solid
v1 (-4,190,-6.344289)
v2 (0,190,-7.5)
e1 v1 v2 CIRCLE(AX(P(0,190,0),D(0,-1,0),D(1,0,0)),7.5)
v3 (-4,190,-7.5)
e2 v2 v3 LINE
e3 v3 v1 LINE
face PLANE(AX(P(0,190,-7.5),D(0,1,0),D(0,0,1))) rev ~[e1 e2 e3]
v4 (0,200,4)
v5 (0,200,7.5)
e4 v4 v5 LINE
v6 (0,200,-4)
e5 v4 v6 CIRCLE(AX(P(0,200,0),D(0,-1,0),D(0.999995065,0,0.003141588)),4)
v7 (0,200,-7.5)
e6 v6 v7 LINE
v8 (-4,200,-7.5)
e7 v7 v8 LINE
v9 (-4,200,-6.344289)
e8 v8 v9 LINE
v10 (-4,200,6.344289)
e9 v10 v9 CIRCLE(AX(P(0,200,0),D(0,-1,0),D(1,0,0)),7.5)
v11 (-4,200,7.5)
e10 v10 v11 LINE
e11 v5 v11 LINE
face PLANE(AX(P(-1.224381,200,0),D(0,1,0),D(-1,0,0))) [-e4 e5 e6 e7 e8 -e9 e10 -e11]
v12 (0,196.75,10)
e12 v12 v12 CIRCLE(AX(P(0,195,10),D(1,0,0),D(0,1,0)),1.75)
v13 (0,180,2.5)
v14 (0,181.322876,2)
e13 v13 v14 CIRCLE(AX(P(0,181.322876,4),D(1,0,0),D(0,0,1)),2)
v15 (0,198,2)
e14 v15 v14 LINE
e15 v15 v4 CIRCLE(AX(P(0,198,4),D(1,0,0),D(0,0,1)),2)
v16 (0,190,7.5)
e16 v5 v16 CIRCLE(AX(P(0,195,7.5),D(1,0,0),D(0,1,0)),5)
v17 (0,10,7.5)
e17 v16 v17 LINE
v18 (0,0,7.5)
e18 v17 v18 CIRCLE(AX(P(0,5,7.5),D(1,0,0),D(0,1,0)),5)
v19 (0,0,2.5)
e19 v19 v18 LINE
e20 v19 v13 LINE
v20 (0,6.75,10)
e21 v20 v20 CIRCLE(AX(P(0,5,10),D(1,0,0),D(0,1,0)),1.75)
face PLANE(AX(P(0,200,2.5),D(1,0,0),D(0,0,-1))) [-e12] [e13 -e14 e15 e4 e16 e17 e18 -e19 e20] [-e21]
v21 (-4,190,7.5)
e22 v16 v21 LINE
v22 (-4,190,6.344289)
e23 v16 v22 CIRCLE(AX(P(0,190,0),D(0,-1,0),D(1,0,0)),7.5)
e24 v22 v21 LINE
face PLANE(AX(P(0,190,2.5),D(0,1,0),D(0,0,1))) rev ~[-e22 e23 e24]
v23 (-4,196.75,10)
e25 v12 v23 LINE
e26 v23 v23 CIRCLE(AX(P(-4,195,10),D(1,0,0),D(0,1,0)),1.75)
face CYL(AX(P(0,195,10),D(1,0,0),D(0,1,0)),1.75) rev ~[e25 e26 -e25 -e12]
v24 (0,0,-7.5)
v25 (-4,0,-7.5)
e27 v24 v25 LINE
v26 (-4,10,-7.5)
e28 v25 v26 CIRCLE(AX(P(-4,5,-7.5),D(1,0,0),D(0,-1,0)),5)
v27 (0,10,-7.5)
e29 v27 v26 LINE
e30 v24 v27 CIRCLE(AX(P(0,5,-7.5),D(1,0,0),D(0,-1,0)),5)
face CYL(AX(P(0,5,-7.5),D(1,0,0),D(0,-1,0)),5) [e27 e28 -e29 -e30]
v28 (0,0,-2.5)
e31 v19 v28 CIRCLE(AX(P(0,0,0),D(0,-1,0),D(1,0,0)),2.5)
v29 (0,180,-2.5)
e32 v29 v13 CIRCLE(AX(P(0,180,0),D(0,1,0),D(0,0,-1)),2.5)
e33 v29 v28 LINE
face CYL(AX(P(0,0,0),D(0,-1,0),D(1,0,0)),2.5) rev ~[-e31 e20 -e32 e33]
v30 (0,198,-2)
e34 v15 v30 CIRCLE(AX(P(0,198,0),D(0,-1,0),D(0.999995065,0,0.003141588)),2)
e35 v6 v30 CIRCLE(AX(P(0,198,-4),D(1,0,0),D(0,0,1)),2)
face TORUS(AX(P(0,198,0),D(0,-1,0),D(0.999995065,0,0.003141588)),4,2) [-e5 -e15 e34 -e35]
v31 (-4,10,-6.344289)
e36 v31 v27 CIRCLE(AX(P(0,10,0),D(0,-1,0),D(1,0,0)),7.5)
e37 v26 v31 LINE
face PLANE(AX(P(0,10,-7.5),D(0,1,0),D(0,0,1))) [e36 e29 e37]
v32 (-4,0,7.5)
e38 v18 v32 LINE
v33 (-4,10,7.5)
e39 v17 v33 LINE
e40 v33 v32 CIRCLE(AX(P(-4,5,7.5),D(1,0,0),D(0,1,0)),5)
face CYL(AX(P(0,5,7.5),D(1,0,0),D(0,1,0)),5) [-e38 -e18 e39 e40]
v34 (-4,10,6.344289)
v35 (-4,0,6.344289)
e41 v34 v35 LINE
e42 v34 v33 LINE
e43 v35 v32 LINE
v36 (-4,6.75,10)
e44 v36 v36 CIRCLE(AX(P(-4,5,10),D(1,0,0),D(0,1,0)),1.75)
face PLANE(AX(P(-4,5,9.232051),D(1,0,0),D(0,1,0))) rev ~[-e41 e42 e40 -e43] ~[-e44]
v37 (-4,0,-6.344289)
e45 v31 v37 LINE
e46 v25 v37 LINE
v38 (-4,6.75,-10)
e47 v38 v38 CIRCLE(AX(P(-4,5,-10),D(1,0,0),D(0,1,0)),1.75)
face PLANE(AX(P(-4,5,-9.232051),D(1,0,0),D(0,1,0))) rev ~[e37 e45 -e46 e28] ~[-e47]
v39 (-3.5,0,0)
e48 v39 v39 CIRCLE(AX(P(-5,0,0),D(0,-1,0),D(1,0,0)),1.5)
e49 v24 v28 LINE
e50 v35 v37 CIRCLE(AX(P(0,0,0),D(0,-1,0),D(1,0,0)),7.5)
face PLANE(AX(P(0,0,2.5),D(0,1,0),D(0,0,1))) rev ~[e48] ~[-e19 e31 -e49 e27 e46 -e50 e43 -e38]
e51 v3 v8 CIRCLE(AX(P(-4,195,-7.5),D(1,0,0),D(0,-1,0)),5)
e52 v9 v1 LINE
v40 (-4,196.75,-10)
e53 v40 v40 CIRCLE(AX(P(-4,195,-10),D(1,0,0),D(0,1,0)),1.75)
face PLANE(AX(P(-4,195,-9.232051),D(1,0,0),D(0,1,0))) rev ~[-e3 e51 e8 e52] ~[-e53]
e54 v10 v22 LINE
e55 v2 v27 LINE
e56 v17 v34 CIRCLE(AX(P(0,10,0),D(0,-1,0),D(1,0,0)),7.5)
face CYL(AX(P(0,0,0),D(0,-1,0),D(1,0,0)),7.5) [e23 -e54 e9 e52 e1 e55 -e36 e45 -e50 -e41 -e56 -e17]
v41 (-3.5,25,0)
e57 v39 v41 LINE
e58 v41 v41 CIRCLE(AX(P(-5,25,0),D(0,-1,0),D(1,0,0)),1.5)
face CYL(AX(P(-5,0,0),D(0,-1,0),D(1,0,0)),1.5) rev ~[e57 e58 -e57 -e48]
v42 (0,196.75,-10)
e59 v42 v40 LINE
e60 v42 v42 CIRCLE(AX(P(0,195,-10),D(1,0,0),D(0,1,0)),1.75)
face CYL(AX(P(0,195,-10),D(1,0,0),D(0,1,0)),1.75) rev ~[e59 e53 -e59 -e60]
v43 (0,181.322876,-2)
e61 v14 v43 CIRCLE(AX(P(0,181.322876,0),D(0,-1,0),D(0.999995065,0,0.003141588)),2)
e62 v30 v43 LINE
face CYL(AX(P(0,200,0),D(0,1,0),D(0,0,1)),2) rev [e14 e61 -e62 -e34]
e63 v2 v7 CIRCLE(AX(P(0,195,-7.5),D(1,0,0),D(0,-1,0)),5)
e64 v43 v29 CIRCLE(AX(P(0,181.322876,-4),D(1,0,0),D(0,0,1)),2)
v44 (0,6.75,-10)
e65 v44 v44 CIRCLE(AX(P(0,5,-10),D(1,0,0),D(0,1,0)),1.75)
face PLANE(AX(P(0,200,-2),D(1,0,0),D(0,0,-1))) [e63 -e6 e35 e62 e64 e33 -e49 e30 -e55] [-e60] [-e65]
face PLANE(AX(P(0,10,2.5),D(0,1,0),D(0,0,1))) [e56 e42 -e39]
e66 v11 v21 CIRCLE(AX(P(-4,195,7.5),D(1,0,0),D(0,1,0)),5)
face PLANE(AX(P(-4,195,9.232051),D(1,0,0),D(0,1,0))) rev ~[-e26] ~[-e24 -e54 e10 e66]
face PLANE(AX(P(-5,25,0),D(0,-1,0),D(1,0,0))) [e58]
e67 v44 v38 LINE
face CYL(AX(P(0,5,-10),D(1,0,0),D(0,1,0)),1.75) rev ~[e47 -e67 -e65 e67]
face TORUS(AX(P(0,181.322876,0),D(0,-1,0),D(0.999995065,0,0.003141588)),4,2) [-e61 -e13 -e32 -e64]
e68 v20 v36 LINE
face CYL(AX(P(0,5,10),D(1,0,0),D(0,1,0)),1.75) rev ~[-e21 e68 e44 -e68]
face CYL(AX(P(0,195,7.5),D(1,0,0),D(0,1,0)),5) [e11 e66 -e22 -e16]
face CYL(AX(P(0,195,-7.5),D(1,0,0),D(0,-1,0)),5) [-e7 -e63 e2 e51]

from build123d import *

# Parameters (mm, degrees)
F0_R         = 7.5
F0_R_2       = 2.5
F1_DEPTH     = 200
F2_R         = 1.5
F3_DEPTH     = 25
F4_W         = 255.6320726871
F4_H         = 34.7503256053
F5_DEPTH     = 25
F6_W         = 10
F6_H         = 5
F6_H_2       = 4.8793365061
F7_DEPTH     = 4
F8_R         = 1.75
F9_DEPTH     = 7.501
F11_DEPTH    = 20
F12_T2_ANGLE = 359.64
F12_T4_ANGLE = 359.64


# Not quite as in the source:
# - a fillet or chamfer that OpenCascade refuses, or shapes differently, is made with other operations: its cross-section is extruded or revolved along the edge and cut away or added


with BuildPart() as f1:
    # F0 (on Front) → F1 (new body)
    with BuildSketch(Plane.XZ):
        Circle(F0_R)
        Circle(F0_R_2, mode=Mode.SUBTRACT)
    extrude(amount=-F1_DEPTH)

    # F2 (on face) → F3 (cut)
    with BuildSketch(Plane.XZ):
        with Locations((5, 0)):
            Circle(F2_R)
        with Locations((-5, 0)):
            Circle(F2_R)
    extrude(amount=-F3_DEPTH, mode=Mode.SUBTRACT)

    # F4 (on Right) → F5 (cut)
    with BuildSketch(Plane.YZ):
        with Locations((127.8160363436, -0.9753750637)):
            Rectangle(F4_W, F4_H)
    extrude(amount=F5_DEPTH, mode=Mode.SUBTRACT)

    # F6 (on face) → F7 (join)
    with BuildSketch(Plane.YZ):
        with BuildLine():
            ThreePointArc((10, 7.5), (5, 12.5), (0, 7.5))
            Line((0, 7.5), (10, 7.5))
        make_face()
        with Locations((5, 5)):
            Rectangle(F6_W, F6_H)
        with BuildLine():
            Line((190, 7.5), (200, 7.5))
            ThreePointArc((200, 7.5), (195, 12.5), (190, 7.5))
        make_face()
        with Locations((195, 5)):
            Rectangle(F6_W, F6_H)
        with BuildLine():
            ThreePointArc((190, -7.5), (195, -12.5), (200, -7.5))
            Line((200, -7.5), (190, -7.5))
        make_face()
        with Locations((195, -5.0603317469)):
            Rectangle(F6_W, F6_H_2)
        with BuildLine():
            Line((10, -7.5), (0, -7.5))
            ThreePointArc((0, -7.5), (5, -12.5), (10, -7.5))
        make_face()
        with Locations((5, -5.0603317469)):
            Rectangle(F6_W, F6_H_2)
    extrude(amount=-F7_DEPTH)

    # F8 (on face) → F9 (cut, through all)
    with BuildSketch(Plane.YZ):
        with Locations((5, 10)):
            Circle(F8_R)
        with Locations((5, -10)):
            Circle(F8_R)
        with Locations((195, 10)):
            Circle(F8_R)
        with Locations((195, -10)):
            Circle(F8_R)
    extrude(amount=-F9_DEPTH, mode=Mode.SUBTRACT)

    # F10 (on face) → F11 (join)
    with BuildSketch(Plane(origin=(0, 200, 0), x_dir=(-1, 0, 0), z_dir=(0, 1, 0))):
        with BuildLine():
            Line((0, 2.5), (0, 2))
            ThreePointArc((0, 2), (2, 0), (0, -2))
            Line((0, -2), (0, -2.5))
            ThreePointArc((0, -2.5), (2.5, 0), (0, 2.5))
        make_face()
    extrude(amount=-F11_DEPTH)

    # F12: fillet of radius 2 on 2 edges, made by hand

    # F12_s1 → F12_t2 (revolve, cut)
    with BuildSketch(Plane(origin=(0, 0, 0), x_dir=(0, 1, 0), z_dir=(0.0031415875, 0, -0.9999950652))):
        with BuildLine():
            ThreePointArc((198, 2), (199.4142135624, 2.5857864376), (200, 4))
            Line((200, 4), (200, 2))
            Line((200, 2), (198, 2))
        make_face()
    revolve(axis=Axis((0, 200, 0), (0, -1, 0)), revolution_arc=F12_T2_ANGLE, mode=Mode.SUBTRACT)

    # F12_s3 → F12_t4 (revolve, cut)
    with BuildSketch(Plane(origin=(0, 0, 0), x_dir=(0, 1, 0), z_dir=(0.0031415875, 0, -0.9999950652))):
        with BuildLine():
            ThreePointArc((180, 2.5), (180.6157688743, 2.1291713066), (181.3228756555, 2))
            Line((181.3228756555, 2), (180, 2))
            Line((180, 2), (180, 2.5))
        make_face()
    revolve(axis=Axis((0, 180, 0), (0, -1, 0)), revolution_arc=F12_T4_ANGLE, mode=Mode.SUBTRACT)


solid = f1.part
